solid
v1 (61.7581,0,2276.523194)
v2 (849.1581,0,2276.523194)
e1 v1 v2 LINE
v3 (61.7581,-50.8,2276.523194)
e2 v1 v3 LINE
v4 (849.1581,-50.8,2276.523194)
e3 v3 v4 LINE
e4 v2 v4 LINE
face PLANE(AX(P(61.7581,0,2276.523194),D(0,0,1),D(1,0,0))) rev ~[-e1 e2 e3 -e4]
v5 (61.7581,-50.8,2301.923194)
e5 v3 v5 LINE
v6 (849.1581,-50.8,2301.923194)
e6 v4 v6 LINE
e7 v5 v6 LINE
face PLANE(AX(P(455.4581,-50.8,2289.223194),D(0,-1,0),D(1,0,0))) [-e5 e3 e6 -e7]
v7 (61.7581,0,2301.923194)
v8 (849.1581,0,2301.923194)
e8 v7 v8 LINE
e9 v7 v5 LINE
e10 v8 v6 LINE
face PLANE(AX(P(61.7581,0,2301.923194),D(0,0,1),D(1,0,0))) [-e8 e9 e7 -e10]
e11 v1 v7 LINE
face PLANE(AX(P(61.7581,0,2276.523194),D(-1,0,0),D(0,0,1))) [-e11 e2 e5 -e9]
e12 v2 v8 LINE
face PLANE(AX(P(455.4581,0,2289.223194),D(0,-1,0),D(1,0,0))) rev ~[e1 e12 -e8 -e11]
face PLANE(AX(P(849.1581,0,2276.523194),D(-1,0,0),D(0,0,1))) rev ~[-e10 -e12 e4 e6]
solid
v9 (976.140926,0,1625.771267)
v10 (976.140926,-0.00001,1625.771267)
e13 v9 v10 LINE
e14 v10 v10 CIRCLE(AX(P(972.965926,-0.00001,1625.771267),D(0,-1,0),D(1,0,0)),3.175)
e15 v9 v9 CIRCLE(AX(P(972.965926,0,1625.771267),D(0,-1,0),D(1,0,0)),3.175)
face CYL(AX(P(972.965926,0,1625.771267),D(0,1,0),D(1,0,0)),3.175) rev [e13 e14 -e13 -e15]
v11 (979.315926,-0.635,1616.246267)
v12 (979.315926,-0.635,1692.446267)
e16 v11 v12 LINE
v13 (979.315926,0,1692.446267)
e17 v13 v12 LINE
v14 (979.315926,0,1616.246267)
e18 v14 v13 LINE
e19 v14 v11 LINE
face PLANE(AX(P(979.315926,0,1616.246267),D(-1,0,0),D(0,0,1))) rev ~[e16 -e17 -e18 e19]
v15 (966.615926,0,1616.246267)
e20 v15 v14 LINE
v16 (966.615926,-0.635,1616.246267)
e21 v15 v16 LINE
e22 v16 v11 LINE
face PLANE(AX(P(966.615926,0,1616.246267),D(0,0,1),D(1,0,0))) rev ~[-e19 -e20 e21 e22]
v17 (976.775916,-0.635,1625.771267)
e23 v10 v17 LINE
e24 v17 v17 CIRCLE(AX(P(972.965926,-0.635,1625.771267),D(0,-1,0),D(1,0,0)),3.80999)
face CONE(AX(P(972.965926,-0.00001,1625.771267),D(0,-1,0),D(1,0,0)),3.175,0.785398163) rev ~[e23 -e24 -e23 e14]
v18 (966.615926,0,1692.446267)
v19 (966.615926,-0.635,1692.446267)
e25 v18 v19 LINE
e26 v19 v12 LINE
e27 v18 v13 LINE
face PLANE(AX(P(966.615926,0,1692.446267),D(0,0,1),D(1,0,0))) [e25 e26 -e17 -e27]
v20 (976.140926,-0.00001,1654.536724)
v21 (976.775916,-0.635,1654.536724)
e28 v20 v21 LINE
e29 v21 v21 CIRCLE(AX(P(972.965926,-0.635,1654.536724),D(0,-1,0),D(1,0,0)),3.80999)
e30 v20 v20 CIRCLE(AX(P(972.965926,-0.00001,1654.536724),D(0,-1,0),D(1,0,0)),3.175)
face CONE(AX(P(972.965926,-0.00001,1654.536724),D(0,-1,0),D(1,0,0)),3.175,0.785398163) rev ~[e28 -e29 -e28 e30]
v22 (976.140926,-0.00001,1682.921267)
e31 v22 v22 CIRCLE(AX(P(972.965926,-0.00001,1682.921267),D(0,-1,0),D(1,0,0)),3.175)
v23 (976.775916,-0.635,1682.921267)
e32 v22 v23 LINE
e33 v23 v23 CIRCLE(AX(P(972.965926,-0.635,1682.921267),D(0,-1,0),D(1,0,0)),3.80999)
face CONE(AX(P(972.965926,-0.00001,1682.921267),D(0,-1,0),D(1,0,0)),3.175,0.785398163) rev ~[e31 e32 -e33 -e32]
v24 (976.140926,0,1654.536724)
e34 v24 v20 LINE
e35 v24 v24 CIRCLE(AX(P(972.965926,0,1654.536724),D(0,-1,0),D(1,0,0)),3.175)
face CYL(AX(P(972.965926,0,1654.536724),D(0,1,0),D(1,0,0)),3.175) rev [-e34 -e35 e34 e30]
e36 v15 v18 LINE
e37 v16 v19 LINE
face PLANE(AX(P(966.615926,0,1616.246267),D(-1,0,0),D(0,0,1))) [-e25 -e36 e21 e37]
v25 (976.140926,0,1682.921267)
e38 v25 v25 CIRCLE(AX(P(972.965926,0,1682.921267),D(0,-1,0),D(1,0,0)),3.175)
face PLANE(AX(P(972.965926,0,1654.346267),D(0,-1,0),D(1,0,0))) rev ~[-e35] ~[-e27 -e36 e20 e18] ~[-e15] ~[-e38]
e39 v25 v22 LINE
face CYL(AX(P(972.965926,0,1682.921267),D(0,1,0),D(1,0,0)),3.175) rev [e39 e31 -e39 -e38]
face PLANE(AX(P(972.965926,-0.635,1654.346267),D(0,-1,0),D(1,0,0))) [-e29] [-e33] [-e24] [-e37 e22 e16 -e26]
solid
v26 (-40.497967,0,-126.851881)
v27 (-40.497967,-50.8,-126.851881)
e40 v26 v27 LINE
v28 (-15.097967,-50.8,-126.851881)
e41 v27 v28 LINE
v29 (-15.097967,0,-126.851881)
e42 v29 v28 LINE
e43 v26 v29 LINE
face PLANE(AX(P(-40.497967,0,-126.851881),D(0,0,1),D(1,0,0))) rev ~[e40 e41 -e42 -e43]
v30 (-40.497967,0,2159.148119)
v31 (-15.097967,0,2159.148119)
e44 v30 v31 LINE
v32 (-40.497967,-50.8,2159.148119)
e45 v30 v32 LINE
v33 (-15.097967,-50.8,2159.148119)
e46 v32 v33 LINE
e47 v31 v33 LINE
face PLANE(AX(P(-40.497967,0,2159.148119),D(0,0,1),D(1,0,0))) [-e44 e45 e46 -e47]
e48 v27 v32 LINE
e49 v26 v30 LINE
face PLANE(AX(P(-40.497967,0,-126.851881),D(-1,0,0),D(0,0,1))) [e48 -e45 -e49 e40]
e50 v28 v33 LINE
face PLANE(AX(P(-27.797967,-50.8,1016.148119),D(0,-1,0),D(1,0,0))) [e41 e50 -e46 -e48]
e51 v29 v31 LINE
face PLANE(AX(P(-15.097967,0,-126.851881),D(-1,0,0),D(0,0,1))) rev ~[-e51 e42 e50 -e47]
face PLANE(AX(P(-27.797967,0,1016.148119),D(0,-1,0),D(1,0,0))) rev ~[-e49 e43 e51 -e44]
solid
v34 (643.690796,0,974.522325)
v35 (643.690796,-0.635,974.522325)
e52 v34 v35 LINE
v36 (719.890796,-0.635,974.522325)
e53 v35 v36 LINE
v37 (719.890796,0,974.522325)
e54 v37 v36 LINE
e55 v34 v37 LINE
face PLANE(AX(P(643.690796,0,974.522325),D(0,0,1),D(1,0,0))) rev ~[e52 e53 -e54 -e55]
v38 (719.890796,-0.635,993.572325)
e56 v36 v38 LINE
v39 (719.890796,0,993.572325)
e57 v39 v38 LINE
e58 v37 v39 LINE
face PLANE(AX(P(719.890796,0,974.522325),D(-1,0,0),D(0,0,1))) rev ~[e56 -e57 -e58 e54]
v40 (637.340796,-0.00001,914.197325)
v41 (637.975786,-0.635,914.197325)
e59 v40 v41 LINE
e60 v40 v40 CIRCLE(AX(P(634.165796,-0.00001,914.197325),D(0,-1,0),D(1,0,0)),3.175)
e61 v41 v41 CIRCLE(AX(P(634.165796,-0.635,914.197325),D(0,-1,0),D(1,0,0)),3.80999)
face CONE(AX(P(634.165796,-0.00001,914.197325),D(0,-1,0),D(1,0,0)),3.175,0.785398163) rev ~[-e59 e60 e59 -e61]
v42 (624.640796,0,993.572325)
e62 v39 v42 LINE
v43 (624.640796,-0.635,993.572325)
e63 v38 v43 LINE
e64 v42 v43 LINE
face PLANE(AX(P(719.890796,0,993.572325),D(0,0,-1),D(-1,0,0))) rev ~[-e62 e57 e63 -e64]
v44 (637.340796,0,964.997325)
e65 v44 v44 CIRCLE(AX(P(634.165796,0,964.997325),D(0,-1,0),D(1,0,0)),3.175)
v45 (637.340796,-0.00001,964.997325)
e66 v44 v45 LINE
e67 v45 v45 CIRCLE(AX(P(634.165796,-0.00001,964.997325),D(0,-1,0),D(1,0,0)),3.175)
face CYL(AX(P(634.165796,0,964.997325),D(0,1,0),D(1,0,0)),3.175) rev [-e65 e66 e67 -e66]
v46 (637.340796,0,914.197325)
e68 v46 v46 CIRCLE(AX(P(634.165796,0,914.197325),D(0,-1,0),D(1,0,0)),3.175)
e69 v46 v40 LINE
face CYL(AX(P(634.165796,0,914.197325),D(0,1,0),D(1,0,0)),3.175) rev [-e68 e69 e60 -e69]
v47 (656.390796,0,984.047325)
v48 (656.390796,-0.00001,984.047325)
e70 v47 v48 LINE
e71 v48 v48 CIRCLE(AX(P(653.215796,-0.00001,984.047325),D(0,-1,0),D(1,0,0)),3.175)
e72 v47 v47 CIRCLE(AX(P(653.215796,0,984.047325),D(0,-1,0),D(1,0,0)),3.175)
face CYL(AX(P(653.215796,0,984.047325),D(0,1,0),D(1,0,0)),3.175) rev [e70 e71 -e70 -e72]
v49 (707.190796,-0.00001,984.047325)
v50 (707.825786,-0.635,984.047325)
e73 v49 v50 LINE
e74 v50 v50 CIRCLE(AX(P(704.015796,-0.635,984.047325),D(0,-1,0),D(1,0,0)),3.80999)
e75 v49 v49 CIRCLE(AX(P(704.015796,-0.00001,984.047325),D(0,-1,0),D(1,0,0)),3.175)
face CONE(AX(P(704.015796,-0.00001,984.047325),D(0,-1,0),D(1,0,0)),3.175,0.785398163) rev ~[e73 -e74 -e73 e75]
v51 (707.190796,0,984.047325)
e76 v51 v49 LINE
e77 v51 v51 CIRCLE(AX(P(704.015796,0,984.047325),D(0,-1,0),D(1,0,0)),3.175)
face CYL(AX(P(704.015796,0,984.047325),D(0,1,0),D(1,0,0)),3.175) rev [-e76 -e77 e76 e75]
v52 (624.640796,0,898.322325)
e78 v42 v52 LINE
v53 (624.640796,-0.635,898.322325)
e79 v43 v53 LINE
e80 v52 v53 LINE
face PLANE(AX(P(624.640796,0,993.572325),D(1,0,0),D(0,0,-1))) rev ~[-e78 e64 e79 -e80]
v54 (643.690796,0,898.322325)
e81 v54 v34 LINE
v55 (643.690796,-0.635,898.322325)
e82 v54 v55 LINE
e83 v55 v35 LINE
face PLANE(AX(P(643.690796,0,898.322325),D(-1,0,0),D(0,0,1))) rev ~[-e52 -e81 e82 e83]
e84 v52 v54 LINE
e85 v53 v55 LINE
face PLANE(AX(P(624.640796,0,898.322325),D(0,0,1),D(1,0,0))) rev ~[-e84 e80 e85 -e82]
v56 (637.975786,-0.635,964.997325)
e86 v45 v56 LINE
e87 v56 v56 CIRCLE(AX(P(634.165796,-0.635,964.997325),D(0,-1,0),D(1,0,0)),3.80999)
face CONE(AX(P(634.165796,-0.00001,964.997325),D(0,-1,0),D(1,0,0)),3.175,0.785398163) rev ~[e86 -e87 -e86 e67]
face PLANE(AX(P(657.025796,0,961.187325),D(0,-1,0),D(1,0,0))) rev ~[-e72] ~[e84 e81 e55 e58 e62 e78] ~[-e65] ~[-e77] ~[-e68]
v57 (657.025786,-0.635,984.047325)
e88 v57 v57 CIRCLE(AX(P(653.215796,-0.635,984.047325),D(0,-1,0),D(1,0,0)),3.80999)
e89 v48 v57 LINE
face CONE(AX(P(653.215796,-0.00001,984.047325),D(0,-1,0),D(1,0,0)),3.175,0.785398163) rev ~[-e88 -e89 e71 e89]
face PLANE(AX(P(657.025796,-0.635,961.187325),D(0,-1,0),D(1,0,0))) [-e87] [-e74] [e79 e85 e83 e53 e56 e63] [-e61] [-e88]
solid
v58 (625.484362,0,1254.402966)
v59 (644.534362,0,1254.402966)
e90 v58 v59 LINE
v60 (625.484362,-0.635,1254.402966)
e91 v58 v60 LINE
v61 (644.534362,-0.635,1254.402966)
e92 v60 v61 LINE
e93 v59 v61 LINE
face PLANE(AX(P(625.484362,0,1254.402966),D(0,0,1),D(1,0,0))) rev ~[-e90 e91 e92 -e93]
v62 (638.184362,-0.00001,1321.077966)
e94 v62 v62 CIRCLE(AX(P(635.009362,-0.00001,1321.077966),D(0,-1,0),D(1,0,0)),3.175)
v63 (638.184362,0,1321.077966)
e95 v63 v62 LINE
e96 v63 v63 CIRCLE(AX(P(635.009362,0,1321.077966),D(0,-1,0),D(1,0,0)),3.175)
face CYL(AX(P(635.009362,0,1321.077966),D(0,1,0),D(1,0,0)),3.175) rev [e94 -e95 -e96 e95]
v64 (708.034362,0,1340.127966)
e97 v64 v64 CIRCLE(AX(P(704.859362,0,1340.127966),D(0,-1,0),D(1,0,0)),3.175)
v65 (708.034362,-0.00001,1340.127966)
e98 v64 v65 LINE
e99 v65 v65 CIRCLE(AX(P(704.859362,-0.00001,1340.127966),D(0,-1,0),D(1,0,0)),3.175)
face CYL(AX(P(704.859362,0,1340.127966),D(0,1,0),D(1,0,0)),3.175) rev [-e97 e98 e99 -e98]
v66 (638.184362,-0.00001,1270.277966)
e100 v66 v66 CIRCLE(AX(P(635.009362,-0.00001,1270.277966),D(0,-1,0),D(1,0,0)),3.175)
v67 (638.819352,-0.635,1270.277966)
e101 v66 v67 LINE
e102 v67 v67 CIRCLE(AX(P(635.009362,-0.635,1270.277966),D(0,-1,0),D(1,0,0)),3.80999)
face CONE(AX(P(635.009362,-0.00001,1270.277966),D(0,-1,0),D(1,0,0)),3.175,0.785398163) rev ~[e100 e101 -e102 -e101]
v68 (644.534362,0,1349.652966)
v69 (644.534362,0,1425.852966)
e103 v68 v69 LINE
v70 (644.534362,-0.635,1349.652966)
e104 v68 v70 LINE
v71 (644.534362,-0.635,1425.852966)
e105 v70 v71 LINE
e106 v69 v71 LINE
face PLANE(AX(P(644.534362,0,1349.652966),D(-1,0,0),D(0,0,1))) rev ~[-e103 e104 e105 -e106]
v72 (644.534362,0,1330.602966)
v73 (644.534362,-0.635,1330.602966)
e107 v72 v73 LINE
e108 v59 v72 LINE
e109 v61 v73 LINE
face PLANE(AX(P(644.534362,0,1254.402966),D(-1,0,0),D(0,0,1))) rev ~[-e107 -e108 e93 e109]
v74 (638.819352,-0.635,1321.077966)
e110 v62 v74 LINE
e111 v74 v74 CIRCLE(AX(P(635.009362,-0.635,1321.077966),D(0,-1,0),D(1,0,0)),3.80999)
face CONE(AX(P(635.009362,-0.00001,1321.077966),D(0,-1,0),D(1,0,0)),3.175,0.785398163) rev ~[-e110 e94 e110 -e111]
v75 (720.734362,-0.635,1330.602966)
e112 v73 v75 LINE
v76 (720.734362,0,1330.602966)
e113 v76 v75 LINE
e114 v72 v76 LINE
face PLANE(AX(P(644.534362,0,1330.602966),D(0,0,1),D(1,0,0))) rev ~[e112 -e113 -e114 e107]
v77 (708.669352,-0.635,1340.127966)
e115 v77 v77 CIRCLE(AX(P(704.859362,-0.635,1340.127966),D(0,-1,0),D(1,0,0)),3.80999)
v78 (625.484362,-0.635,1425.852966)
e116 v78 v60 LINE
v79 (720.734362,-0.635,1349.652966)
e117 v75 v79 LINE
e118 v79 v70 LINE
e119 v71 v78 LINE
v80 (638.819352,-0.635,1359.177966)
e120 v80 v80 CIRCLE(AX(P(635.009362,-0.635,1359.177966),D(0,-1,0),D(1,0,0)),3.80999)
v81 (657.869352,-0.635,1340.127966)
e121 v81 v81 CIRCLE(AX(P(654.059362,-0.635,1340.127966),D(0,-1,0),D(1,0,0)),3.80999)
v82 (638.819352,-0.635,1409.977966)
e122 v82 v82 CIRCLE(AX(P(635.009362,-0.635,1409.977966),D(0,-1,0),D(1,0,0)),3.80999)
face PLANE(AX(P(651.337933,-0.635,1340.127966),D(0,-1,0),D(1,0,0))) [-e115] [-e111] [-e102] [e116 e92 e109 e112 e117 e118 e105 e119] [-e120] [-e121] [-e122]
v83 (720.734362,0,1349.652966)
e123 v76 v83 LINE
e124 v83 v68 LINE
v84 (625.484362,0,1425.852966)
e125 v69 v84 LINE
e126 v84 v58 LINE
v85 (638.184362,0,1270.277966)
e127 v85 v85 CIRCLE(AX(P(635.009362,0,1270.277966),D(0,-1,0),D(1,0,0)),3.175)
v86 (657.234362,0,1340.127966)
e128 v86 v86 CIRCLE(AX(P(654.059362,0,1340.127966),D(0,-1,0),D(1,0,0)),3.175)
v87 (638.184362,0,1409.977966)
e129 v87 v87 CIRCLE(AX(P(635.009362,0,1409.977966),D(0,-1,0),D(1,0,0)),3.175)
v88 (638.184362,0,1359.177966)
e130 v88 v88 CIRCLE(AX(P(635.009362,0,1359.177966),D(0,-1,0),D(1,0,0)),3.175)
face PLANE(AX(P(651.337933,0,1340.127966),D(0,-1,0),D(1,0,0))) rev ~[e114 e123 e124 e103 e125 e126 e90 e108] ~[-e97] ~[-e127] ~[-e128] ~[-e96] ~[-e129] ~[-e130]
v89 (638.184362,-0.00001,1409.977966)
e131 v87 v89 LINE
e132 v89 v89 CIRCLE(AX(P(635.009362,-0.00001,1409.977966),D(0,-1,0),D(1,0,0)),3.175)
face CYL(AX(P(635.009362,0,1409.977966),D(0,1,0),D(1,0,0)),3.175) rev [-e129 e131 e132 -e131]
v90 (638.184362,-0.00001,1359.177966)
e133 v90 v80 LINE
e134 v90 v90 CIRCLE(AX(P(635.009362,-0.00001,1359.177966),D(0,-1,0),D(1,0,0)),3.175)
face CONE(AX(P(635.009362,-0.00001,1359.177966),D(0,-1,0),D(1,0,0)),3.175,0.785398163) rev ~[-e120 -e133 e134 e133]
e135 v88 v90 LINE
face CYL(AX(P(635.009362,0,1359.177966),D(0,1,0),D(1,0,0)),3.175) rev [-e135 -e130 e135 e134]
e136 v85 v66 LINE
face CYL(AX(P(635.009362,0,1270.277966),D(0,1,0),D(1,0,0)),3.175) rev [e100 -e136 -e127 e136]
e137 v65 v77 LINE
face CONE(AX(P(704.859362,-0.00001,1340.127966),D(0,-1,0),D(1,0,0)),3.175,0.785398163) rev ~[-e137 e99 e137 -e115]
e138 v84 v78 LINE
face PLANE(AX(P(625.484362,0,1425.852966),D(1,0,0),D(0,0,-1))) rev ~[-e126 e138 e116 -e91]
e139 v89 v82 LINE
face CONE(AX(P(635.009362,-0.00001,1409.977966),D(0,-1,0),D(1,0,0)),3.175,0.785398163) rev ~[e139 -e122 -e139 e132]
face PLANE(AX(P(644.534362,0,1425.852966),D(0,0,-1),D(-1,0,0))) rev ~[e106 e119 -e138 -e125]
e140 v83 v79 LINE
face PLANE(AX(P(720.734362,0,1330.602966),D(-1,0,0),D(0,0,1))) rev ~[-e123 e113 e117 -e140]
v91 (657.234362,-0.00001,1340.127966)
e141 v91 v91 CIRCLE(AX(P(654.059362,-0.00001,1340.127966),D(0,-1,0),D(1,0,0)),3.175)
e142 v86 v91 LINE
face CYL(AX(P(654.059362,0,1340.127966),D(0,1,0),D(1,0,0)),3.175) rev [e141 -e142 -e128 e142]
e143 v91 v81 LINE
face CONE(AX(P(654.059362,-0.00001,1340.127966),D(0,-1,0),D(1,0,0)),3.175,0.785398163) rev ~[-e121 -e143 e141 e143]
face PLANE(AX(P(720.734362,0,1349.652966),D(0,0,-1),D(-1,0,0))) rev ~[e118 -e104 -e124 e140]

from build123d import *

# Parameters (mm, degrees)
F1_W      = 787.4
F1_H      = 25.4
F2_DEPTH  = 50.8
F0_W      = 25.4
F0_H      = 2286
F3_DEPTH  = 50.8
F4_R      = 3.175
F5_DEPTH  = 0.635
F6_R      = 3.175
F7_DEPTH  = 0.635
F8_SIZE   = 0.63499
F9_SIZE   = 0.63499
F10_W     = 12.7
F10_H     = 76.2
F10_R     = 3.175
F11_DEPTH = 0.635
F12_SIZE  = 0.63499


# Not quite as in the source:
# - a fillet or chamfer is up to 0.001 mm smaller than in the source, because OpenCascade refuses the exact size


with BuildPart() as f2:
    # F1 (on Front) → F2 (new body)
    with BuildSketch(Plane.XZ):
        with Locations((455.4581004176, 2289.2231941223)):
            Rectangle(F1_W, F1_H)
    extrude(amount=F2_DEPTH)


with BuildPart() as f3:
    # F0 (on Front) → F3 (new body)
    with BuildSketch(Plane.XZ):
        with Locations((-27.7979671955, 1016.1481191226)):
            Rectangle(F0_W, F0_H)
    extrude(amount=F3_DEPTH)


with BuildPart() as f5:
    # F4 (on Front) → F5 (new body)
    with BuildSketch(Plane.XZ):
        Polygon((624.6407955857, 993.5723245871), (624.6407955857, 898.3223245871), (643.6907955857, 898.3223245871), (643.6907955857, 974.5223245871), (719.8907955857, 974.5223245871), (719.8907955857, 993.5723245871), align=None)
        with Locations((634.1657955857, 914.1973245871)):
            Circle(F4_R, mode=Mode.SUBTRACT)
        with Locations((634.1657955857, 964.9973245871)):
            Circle(F4_R, mode=Mode.SUBTRACT)
        with Locations((653.2157955857, 984.0473245871)):
            Circle(F4_R, mode=Mode.SUBTRACT)
        with Locations((704.0157955857, 984.0473245871)):
            Circle(F4_R, mode=Mode.SUBTRACT)
    extrude(amount=F5_DEPTH)

    # F9 (size 0.635 in the source; OpenCascade refuses exactly that, so slightly less here)
    f9_edges = [f5.edges().sort_by_distance(p)[0] for p in [
        (700.840796, -0.635, 984.047325),
        (650.040796, -0.635, 984.047325),
        (630.990796, -0.635, 964.997325),
        (630.990796, -0.635, 914.197325),
    ]]
    chamfer(f9_edges, length=F9_SIZE)


with BuildPart() as f7:
    # F6 (on Front) → F7 (new body)
    with BuildSketch(Plane.XZ):
        Polygon((625.4843616006, 1425.8529662132), (625.4843616006, 1254.4029662132), (644.5343616006, 1254.4029662132), (644.5343616006, 1330.6029662132), (720.7343616006, 1330.6029662132), (720.7343616006, 1349.6529662132), (644.5343616006, 1349.6529662132), (644.5343616006, 1425.8529662132), align=None)
        with Locations((635.0093616006, 1270.2779662132)):
            Circle(F6_R, mode=Mode.SUBTRACT)
        with Locations((635.0093616006, 1321.0779662132)):
            Circle(F6_R, mode=Mode.SUBTRACT)
        with Locations((654.0593616006, 1340.1279662132)):
            Circle(F6_R, mode=Mode.SUBTRACT)
        with Locations((704.8593616006, 1340.1279662132)):
            Circle(F6_R, mode=Mode.SUBTRACT)
        with Locations((635.0093616006, 1359.1779662132)):
            Circle(F6_R, mode=Mode.SUBTRACT)
        with Locations((635.0093616006, 1409.9779662132)):
            Circle(F6_R, mode=Mode.SUBTRACT)
    extrude(amount=F7_DEPTH)

    # F8 (size 0.635 in the source; OpenCascade refuses exactly that, so slightly less here)
    f8_edges = [f7.edges().sort_by_distance(p)[0] for p in [
        (701.684362, -0.635, 1340.127966),
        (650.884362, -0.635, 1340.127966),
        (631.834362, -0.635, 1321.077966),
        (631.834362, -0.635, 1270.277966),
        (631.834362, -0.635, 1359.177966),
        (631.834362, -0.635, 1409.977966),
    ]]
    chamfer(f8_edges, length=F8_SIZE)


with BuildPart() as f11:
    # F10 (on Front) → F11 (new body)
    with BuildSketch(Plane.XZ):
        with Locations((972.9659259319, 1654.346266764)):
            Rectangle(F10_W, F10_H)
        with Locations((972.9659259319, 1625.771266764)):
            Circle(F10_R, mode=Mode.SUBTRACT)
        with Locations((972.9659259319, 1654.5367240906)):
            Circle(F10_R, mode=Mode.SUBTRACT)
        with Locations((972.9659259319, 1682.921266764)):
            Circle(F10_R, mode=Mode.SUBTRACT)
    extrude(amount=F11_DEPTH)

    # F12 (size 0.635 in the source; OpenCascade refuses exactly that, so slightly less here)
    f12_edges = [f11.edges().sort_by_distance(p)[0] for p in [
        (969.790926, -0.635, 1625.771267),
        (969.790926, -0.635, 1654.536724),
        (969.790926, -0.635, 1682.921267),
    ]]
    chamfer(f12_edges, length=F12_SIZE)


solid = Compound([f2.part, f3.part, f5.part, f7.part, f11.part])
